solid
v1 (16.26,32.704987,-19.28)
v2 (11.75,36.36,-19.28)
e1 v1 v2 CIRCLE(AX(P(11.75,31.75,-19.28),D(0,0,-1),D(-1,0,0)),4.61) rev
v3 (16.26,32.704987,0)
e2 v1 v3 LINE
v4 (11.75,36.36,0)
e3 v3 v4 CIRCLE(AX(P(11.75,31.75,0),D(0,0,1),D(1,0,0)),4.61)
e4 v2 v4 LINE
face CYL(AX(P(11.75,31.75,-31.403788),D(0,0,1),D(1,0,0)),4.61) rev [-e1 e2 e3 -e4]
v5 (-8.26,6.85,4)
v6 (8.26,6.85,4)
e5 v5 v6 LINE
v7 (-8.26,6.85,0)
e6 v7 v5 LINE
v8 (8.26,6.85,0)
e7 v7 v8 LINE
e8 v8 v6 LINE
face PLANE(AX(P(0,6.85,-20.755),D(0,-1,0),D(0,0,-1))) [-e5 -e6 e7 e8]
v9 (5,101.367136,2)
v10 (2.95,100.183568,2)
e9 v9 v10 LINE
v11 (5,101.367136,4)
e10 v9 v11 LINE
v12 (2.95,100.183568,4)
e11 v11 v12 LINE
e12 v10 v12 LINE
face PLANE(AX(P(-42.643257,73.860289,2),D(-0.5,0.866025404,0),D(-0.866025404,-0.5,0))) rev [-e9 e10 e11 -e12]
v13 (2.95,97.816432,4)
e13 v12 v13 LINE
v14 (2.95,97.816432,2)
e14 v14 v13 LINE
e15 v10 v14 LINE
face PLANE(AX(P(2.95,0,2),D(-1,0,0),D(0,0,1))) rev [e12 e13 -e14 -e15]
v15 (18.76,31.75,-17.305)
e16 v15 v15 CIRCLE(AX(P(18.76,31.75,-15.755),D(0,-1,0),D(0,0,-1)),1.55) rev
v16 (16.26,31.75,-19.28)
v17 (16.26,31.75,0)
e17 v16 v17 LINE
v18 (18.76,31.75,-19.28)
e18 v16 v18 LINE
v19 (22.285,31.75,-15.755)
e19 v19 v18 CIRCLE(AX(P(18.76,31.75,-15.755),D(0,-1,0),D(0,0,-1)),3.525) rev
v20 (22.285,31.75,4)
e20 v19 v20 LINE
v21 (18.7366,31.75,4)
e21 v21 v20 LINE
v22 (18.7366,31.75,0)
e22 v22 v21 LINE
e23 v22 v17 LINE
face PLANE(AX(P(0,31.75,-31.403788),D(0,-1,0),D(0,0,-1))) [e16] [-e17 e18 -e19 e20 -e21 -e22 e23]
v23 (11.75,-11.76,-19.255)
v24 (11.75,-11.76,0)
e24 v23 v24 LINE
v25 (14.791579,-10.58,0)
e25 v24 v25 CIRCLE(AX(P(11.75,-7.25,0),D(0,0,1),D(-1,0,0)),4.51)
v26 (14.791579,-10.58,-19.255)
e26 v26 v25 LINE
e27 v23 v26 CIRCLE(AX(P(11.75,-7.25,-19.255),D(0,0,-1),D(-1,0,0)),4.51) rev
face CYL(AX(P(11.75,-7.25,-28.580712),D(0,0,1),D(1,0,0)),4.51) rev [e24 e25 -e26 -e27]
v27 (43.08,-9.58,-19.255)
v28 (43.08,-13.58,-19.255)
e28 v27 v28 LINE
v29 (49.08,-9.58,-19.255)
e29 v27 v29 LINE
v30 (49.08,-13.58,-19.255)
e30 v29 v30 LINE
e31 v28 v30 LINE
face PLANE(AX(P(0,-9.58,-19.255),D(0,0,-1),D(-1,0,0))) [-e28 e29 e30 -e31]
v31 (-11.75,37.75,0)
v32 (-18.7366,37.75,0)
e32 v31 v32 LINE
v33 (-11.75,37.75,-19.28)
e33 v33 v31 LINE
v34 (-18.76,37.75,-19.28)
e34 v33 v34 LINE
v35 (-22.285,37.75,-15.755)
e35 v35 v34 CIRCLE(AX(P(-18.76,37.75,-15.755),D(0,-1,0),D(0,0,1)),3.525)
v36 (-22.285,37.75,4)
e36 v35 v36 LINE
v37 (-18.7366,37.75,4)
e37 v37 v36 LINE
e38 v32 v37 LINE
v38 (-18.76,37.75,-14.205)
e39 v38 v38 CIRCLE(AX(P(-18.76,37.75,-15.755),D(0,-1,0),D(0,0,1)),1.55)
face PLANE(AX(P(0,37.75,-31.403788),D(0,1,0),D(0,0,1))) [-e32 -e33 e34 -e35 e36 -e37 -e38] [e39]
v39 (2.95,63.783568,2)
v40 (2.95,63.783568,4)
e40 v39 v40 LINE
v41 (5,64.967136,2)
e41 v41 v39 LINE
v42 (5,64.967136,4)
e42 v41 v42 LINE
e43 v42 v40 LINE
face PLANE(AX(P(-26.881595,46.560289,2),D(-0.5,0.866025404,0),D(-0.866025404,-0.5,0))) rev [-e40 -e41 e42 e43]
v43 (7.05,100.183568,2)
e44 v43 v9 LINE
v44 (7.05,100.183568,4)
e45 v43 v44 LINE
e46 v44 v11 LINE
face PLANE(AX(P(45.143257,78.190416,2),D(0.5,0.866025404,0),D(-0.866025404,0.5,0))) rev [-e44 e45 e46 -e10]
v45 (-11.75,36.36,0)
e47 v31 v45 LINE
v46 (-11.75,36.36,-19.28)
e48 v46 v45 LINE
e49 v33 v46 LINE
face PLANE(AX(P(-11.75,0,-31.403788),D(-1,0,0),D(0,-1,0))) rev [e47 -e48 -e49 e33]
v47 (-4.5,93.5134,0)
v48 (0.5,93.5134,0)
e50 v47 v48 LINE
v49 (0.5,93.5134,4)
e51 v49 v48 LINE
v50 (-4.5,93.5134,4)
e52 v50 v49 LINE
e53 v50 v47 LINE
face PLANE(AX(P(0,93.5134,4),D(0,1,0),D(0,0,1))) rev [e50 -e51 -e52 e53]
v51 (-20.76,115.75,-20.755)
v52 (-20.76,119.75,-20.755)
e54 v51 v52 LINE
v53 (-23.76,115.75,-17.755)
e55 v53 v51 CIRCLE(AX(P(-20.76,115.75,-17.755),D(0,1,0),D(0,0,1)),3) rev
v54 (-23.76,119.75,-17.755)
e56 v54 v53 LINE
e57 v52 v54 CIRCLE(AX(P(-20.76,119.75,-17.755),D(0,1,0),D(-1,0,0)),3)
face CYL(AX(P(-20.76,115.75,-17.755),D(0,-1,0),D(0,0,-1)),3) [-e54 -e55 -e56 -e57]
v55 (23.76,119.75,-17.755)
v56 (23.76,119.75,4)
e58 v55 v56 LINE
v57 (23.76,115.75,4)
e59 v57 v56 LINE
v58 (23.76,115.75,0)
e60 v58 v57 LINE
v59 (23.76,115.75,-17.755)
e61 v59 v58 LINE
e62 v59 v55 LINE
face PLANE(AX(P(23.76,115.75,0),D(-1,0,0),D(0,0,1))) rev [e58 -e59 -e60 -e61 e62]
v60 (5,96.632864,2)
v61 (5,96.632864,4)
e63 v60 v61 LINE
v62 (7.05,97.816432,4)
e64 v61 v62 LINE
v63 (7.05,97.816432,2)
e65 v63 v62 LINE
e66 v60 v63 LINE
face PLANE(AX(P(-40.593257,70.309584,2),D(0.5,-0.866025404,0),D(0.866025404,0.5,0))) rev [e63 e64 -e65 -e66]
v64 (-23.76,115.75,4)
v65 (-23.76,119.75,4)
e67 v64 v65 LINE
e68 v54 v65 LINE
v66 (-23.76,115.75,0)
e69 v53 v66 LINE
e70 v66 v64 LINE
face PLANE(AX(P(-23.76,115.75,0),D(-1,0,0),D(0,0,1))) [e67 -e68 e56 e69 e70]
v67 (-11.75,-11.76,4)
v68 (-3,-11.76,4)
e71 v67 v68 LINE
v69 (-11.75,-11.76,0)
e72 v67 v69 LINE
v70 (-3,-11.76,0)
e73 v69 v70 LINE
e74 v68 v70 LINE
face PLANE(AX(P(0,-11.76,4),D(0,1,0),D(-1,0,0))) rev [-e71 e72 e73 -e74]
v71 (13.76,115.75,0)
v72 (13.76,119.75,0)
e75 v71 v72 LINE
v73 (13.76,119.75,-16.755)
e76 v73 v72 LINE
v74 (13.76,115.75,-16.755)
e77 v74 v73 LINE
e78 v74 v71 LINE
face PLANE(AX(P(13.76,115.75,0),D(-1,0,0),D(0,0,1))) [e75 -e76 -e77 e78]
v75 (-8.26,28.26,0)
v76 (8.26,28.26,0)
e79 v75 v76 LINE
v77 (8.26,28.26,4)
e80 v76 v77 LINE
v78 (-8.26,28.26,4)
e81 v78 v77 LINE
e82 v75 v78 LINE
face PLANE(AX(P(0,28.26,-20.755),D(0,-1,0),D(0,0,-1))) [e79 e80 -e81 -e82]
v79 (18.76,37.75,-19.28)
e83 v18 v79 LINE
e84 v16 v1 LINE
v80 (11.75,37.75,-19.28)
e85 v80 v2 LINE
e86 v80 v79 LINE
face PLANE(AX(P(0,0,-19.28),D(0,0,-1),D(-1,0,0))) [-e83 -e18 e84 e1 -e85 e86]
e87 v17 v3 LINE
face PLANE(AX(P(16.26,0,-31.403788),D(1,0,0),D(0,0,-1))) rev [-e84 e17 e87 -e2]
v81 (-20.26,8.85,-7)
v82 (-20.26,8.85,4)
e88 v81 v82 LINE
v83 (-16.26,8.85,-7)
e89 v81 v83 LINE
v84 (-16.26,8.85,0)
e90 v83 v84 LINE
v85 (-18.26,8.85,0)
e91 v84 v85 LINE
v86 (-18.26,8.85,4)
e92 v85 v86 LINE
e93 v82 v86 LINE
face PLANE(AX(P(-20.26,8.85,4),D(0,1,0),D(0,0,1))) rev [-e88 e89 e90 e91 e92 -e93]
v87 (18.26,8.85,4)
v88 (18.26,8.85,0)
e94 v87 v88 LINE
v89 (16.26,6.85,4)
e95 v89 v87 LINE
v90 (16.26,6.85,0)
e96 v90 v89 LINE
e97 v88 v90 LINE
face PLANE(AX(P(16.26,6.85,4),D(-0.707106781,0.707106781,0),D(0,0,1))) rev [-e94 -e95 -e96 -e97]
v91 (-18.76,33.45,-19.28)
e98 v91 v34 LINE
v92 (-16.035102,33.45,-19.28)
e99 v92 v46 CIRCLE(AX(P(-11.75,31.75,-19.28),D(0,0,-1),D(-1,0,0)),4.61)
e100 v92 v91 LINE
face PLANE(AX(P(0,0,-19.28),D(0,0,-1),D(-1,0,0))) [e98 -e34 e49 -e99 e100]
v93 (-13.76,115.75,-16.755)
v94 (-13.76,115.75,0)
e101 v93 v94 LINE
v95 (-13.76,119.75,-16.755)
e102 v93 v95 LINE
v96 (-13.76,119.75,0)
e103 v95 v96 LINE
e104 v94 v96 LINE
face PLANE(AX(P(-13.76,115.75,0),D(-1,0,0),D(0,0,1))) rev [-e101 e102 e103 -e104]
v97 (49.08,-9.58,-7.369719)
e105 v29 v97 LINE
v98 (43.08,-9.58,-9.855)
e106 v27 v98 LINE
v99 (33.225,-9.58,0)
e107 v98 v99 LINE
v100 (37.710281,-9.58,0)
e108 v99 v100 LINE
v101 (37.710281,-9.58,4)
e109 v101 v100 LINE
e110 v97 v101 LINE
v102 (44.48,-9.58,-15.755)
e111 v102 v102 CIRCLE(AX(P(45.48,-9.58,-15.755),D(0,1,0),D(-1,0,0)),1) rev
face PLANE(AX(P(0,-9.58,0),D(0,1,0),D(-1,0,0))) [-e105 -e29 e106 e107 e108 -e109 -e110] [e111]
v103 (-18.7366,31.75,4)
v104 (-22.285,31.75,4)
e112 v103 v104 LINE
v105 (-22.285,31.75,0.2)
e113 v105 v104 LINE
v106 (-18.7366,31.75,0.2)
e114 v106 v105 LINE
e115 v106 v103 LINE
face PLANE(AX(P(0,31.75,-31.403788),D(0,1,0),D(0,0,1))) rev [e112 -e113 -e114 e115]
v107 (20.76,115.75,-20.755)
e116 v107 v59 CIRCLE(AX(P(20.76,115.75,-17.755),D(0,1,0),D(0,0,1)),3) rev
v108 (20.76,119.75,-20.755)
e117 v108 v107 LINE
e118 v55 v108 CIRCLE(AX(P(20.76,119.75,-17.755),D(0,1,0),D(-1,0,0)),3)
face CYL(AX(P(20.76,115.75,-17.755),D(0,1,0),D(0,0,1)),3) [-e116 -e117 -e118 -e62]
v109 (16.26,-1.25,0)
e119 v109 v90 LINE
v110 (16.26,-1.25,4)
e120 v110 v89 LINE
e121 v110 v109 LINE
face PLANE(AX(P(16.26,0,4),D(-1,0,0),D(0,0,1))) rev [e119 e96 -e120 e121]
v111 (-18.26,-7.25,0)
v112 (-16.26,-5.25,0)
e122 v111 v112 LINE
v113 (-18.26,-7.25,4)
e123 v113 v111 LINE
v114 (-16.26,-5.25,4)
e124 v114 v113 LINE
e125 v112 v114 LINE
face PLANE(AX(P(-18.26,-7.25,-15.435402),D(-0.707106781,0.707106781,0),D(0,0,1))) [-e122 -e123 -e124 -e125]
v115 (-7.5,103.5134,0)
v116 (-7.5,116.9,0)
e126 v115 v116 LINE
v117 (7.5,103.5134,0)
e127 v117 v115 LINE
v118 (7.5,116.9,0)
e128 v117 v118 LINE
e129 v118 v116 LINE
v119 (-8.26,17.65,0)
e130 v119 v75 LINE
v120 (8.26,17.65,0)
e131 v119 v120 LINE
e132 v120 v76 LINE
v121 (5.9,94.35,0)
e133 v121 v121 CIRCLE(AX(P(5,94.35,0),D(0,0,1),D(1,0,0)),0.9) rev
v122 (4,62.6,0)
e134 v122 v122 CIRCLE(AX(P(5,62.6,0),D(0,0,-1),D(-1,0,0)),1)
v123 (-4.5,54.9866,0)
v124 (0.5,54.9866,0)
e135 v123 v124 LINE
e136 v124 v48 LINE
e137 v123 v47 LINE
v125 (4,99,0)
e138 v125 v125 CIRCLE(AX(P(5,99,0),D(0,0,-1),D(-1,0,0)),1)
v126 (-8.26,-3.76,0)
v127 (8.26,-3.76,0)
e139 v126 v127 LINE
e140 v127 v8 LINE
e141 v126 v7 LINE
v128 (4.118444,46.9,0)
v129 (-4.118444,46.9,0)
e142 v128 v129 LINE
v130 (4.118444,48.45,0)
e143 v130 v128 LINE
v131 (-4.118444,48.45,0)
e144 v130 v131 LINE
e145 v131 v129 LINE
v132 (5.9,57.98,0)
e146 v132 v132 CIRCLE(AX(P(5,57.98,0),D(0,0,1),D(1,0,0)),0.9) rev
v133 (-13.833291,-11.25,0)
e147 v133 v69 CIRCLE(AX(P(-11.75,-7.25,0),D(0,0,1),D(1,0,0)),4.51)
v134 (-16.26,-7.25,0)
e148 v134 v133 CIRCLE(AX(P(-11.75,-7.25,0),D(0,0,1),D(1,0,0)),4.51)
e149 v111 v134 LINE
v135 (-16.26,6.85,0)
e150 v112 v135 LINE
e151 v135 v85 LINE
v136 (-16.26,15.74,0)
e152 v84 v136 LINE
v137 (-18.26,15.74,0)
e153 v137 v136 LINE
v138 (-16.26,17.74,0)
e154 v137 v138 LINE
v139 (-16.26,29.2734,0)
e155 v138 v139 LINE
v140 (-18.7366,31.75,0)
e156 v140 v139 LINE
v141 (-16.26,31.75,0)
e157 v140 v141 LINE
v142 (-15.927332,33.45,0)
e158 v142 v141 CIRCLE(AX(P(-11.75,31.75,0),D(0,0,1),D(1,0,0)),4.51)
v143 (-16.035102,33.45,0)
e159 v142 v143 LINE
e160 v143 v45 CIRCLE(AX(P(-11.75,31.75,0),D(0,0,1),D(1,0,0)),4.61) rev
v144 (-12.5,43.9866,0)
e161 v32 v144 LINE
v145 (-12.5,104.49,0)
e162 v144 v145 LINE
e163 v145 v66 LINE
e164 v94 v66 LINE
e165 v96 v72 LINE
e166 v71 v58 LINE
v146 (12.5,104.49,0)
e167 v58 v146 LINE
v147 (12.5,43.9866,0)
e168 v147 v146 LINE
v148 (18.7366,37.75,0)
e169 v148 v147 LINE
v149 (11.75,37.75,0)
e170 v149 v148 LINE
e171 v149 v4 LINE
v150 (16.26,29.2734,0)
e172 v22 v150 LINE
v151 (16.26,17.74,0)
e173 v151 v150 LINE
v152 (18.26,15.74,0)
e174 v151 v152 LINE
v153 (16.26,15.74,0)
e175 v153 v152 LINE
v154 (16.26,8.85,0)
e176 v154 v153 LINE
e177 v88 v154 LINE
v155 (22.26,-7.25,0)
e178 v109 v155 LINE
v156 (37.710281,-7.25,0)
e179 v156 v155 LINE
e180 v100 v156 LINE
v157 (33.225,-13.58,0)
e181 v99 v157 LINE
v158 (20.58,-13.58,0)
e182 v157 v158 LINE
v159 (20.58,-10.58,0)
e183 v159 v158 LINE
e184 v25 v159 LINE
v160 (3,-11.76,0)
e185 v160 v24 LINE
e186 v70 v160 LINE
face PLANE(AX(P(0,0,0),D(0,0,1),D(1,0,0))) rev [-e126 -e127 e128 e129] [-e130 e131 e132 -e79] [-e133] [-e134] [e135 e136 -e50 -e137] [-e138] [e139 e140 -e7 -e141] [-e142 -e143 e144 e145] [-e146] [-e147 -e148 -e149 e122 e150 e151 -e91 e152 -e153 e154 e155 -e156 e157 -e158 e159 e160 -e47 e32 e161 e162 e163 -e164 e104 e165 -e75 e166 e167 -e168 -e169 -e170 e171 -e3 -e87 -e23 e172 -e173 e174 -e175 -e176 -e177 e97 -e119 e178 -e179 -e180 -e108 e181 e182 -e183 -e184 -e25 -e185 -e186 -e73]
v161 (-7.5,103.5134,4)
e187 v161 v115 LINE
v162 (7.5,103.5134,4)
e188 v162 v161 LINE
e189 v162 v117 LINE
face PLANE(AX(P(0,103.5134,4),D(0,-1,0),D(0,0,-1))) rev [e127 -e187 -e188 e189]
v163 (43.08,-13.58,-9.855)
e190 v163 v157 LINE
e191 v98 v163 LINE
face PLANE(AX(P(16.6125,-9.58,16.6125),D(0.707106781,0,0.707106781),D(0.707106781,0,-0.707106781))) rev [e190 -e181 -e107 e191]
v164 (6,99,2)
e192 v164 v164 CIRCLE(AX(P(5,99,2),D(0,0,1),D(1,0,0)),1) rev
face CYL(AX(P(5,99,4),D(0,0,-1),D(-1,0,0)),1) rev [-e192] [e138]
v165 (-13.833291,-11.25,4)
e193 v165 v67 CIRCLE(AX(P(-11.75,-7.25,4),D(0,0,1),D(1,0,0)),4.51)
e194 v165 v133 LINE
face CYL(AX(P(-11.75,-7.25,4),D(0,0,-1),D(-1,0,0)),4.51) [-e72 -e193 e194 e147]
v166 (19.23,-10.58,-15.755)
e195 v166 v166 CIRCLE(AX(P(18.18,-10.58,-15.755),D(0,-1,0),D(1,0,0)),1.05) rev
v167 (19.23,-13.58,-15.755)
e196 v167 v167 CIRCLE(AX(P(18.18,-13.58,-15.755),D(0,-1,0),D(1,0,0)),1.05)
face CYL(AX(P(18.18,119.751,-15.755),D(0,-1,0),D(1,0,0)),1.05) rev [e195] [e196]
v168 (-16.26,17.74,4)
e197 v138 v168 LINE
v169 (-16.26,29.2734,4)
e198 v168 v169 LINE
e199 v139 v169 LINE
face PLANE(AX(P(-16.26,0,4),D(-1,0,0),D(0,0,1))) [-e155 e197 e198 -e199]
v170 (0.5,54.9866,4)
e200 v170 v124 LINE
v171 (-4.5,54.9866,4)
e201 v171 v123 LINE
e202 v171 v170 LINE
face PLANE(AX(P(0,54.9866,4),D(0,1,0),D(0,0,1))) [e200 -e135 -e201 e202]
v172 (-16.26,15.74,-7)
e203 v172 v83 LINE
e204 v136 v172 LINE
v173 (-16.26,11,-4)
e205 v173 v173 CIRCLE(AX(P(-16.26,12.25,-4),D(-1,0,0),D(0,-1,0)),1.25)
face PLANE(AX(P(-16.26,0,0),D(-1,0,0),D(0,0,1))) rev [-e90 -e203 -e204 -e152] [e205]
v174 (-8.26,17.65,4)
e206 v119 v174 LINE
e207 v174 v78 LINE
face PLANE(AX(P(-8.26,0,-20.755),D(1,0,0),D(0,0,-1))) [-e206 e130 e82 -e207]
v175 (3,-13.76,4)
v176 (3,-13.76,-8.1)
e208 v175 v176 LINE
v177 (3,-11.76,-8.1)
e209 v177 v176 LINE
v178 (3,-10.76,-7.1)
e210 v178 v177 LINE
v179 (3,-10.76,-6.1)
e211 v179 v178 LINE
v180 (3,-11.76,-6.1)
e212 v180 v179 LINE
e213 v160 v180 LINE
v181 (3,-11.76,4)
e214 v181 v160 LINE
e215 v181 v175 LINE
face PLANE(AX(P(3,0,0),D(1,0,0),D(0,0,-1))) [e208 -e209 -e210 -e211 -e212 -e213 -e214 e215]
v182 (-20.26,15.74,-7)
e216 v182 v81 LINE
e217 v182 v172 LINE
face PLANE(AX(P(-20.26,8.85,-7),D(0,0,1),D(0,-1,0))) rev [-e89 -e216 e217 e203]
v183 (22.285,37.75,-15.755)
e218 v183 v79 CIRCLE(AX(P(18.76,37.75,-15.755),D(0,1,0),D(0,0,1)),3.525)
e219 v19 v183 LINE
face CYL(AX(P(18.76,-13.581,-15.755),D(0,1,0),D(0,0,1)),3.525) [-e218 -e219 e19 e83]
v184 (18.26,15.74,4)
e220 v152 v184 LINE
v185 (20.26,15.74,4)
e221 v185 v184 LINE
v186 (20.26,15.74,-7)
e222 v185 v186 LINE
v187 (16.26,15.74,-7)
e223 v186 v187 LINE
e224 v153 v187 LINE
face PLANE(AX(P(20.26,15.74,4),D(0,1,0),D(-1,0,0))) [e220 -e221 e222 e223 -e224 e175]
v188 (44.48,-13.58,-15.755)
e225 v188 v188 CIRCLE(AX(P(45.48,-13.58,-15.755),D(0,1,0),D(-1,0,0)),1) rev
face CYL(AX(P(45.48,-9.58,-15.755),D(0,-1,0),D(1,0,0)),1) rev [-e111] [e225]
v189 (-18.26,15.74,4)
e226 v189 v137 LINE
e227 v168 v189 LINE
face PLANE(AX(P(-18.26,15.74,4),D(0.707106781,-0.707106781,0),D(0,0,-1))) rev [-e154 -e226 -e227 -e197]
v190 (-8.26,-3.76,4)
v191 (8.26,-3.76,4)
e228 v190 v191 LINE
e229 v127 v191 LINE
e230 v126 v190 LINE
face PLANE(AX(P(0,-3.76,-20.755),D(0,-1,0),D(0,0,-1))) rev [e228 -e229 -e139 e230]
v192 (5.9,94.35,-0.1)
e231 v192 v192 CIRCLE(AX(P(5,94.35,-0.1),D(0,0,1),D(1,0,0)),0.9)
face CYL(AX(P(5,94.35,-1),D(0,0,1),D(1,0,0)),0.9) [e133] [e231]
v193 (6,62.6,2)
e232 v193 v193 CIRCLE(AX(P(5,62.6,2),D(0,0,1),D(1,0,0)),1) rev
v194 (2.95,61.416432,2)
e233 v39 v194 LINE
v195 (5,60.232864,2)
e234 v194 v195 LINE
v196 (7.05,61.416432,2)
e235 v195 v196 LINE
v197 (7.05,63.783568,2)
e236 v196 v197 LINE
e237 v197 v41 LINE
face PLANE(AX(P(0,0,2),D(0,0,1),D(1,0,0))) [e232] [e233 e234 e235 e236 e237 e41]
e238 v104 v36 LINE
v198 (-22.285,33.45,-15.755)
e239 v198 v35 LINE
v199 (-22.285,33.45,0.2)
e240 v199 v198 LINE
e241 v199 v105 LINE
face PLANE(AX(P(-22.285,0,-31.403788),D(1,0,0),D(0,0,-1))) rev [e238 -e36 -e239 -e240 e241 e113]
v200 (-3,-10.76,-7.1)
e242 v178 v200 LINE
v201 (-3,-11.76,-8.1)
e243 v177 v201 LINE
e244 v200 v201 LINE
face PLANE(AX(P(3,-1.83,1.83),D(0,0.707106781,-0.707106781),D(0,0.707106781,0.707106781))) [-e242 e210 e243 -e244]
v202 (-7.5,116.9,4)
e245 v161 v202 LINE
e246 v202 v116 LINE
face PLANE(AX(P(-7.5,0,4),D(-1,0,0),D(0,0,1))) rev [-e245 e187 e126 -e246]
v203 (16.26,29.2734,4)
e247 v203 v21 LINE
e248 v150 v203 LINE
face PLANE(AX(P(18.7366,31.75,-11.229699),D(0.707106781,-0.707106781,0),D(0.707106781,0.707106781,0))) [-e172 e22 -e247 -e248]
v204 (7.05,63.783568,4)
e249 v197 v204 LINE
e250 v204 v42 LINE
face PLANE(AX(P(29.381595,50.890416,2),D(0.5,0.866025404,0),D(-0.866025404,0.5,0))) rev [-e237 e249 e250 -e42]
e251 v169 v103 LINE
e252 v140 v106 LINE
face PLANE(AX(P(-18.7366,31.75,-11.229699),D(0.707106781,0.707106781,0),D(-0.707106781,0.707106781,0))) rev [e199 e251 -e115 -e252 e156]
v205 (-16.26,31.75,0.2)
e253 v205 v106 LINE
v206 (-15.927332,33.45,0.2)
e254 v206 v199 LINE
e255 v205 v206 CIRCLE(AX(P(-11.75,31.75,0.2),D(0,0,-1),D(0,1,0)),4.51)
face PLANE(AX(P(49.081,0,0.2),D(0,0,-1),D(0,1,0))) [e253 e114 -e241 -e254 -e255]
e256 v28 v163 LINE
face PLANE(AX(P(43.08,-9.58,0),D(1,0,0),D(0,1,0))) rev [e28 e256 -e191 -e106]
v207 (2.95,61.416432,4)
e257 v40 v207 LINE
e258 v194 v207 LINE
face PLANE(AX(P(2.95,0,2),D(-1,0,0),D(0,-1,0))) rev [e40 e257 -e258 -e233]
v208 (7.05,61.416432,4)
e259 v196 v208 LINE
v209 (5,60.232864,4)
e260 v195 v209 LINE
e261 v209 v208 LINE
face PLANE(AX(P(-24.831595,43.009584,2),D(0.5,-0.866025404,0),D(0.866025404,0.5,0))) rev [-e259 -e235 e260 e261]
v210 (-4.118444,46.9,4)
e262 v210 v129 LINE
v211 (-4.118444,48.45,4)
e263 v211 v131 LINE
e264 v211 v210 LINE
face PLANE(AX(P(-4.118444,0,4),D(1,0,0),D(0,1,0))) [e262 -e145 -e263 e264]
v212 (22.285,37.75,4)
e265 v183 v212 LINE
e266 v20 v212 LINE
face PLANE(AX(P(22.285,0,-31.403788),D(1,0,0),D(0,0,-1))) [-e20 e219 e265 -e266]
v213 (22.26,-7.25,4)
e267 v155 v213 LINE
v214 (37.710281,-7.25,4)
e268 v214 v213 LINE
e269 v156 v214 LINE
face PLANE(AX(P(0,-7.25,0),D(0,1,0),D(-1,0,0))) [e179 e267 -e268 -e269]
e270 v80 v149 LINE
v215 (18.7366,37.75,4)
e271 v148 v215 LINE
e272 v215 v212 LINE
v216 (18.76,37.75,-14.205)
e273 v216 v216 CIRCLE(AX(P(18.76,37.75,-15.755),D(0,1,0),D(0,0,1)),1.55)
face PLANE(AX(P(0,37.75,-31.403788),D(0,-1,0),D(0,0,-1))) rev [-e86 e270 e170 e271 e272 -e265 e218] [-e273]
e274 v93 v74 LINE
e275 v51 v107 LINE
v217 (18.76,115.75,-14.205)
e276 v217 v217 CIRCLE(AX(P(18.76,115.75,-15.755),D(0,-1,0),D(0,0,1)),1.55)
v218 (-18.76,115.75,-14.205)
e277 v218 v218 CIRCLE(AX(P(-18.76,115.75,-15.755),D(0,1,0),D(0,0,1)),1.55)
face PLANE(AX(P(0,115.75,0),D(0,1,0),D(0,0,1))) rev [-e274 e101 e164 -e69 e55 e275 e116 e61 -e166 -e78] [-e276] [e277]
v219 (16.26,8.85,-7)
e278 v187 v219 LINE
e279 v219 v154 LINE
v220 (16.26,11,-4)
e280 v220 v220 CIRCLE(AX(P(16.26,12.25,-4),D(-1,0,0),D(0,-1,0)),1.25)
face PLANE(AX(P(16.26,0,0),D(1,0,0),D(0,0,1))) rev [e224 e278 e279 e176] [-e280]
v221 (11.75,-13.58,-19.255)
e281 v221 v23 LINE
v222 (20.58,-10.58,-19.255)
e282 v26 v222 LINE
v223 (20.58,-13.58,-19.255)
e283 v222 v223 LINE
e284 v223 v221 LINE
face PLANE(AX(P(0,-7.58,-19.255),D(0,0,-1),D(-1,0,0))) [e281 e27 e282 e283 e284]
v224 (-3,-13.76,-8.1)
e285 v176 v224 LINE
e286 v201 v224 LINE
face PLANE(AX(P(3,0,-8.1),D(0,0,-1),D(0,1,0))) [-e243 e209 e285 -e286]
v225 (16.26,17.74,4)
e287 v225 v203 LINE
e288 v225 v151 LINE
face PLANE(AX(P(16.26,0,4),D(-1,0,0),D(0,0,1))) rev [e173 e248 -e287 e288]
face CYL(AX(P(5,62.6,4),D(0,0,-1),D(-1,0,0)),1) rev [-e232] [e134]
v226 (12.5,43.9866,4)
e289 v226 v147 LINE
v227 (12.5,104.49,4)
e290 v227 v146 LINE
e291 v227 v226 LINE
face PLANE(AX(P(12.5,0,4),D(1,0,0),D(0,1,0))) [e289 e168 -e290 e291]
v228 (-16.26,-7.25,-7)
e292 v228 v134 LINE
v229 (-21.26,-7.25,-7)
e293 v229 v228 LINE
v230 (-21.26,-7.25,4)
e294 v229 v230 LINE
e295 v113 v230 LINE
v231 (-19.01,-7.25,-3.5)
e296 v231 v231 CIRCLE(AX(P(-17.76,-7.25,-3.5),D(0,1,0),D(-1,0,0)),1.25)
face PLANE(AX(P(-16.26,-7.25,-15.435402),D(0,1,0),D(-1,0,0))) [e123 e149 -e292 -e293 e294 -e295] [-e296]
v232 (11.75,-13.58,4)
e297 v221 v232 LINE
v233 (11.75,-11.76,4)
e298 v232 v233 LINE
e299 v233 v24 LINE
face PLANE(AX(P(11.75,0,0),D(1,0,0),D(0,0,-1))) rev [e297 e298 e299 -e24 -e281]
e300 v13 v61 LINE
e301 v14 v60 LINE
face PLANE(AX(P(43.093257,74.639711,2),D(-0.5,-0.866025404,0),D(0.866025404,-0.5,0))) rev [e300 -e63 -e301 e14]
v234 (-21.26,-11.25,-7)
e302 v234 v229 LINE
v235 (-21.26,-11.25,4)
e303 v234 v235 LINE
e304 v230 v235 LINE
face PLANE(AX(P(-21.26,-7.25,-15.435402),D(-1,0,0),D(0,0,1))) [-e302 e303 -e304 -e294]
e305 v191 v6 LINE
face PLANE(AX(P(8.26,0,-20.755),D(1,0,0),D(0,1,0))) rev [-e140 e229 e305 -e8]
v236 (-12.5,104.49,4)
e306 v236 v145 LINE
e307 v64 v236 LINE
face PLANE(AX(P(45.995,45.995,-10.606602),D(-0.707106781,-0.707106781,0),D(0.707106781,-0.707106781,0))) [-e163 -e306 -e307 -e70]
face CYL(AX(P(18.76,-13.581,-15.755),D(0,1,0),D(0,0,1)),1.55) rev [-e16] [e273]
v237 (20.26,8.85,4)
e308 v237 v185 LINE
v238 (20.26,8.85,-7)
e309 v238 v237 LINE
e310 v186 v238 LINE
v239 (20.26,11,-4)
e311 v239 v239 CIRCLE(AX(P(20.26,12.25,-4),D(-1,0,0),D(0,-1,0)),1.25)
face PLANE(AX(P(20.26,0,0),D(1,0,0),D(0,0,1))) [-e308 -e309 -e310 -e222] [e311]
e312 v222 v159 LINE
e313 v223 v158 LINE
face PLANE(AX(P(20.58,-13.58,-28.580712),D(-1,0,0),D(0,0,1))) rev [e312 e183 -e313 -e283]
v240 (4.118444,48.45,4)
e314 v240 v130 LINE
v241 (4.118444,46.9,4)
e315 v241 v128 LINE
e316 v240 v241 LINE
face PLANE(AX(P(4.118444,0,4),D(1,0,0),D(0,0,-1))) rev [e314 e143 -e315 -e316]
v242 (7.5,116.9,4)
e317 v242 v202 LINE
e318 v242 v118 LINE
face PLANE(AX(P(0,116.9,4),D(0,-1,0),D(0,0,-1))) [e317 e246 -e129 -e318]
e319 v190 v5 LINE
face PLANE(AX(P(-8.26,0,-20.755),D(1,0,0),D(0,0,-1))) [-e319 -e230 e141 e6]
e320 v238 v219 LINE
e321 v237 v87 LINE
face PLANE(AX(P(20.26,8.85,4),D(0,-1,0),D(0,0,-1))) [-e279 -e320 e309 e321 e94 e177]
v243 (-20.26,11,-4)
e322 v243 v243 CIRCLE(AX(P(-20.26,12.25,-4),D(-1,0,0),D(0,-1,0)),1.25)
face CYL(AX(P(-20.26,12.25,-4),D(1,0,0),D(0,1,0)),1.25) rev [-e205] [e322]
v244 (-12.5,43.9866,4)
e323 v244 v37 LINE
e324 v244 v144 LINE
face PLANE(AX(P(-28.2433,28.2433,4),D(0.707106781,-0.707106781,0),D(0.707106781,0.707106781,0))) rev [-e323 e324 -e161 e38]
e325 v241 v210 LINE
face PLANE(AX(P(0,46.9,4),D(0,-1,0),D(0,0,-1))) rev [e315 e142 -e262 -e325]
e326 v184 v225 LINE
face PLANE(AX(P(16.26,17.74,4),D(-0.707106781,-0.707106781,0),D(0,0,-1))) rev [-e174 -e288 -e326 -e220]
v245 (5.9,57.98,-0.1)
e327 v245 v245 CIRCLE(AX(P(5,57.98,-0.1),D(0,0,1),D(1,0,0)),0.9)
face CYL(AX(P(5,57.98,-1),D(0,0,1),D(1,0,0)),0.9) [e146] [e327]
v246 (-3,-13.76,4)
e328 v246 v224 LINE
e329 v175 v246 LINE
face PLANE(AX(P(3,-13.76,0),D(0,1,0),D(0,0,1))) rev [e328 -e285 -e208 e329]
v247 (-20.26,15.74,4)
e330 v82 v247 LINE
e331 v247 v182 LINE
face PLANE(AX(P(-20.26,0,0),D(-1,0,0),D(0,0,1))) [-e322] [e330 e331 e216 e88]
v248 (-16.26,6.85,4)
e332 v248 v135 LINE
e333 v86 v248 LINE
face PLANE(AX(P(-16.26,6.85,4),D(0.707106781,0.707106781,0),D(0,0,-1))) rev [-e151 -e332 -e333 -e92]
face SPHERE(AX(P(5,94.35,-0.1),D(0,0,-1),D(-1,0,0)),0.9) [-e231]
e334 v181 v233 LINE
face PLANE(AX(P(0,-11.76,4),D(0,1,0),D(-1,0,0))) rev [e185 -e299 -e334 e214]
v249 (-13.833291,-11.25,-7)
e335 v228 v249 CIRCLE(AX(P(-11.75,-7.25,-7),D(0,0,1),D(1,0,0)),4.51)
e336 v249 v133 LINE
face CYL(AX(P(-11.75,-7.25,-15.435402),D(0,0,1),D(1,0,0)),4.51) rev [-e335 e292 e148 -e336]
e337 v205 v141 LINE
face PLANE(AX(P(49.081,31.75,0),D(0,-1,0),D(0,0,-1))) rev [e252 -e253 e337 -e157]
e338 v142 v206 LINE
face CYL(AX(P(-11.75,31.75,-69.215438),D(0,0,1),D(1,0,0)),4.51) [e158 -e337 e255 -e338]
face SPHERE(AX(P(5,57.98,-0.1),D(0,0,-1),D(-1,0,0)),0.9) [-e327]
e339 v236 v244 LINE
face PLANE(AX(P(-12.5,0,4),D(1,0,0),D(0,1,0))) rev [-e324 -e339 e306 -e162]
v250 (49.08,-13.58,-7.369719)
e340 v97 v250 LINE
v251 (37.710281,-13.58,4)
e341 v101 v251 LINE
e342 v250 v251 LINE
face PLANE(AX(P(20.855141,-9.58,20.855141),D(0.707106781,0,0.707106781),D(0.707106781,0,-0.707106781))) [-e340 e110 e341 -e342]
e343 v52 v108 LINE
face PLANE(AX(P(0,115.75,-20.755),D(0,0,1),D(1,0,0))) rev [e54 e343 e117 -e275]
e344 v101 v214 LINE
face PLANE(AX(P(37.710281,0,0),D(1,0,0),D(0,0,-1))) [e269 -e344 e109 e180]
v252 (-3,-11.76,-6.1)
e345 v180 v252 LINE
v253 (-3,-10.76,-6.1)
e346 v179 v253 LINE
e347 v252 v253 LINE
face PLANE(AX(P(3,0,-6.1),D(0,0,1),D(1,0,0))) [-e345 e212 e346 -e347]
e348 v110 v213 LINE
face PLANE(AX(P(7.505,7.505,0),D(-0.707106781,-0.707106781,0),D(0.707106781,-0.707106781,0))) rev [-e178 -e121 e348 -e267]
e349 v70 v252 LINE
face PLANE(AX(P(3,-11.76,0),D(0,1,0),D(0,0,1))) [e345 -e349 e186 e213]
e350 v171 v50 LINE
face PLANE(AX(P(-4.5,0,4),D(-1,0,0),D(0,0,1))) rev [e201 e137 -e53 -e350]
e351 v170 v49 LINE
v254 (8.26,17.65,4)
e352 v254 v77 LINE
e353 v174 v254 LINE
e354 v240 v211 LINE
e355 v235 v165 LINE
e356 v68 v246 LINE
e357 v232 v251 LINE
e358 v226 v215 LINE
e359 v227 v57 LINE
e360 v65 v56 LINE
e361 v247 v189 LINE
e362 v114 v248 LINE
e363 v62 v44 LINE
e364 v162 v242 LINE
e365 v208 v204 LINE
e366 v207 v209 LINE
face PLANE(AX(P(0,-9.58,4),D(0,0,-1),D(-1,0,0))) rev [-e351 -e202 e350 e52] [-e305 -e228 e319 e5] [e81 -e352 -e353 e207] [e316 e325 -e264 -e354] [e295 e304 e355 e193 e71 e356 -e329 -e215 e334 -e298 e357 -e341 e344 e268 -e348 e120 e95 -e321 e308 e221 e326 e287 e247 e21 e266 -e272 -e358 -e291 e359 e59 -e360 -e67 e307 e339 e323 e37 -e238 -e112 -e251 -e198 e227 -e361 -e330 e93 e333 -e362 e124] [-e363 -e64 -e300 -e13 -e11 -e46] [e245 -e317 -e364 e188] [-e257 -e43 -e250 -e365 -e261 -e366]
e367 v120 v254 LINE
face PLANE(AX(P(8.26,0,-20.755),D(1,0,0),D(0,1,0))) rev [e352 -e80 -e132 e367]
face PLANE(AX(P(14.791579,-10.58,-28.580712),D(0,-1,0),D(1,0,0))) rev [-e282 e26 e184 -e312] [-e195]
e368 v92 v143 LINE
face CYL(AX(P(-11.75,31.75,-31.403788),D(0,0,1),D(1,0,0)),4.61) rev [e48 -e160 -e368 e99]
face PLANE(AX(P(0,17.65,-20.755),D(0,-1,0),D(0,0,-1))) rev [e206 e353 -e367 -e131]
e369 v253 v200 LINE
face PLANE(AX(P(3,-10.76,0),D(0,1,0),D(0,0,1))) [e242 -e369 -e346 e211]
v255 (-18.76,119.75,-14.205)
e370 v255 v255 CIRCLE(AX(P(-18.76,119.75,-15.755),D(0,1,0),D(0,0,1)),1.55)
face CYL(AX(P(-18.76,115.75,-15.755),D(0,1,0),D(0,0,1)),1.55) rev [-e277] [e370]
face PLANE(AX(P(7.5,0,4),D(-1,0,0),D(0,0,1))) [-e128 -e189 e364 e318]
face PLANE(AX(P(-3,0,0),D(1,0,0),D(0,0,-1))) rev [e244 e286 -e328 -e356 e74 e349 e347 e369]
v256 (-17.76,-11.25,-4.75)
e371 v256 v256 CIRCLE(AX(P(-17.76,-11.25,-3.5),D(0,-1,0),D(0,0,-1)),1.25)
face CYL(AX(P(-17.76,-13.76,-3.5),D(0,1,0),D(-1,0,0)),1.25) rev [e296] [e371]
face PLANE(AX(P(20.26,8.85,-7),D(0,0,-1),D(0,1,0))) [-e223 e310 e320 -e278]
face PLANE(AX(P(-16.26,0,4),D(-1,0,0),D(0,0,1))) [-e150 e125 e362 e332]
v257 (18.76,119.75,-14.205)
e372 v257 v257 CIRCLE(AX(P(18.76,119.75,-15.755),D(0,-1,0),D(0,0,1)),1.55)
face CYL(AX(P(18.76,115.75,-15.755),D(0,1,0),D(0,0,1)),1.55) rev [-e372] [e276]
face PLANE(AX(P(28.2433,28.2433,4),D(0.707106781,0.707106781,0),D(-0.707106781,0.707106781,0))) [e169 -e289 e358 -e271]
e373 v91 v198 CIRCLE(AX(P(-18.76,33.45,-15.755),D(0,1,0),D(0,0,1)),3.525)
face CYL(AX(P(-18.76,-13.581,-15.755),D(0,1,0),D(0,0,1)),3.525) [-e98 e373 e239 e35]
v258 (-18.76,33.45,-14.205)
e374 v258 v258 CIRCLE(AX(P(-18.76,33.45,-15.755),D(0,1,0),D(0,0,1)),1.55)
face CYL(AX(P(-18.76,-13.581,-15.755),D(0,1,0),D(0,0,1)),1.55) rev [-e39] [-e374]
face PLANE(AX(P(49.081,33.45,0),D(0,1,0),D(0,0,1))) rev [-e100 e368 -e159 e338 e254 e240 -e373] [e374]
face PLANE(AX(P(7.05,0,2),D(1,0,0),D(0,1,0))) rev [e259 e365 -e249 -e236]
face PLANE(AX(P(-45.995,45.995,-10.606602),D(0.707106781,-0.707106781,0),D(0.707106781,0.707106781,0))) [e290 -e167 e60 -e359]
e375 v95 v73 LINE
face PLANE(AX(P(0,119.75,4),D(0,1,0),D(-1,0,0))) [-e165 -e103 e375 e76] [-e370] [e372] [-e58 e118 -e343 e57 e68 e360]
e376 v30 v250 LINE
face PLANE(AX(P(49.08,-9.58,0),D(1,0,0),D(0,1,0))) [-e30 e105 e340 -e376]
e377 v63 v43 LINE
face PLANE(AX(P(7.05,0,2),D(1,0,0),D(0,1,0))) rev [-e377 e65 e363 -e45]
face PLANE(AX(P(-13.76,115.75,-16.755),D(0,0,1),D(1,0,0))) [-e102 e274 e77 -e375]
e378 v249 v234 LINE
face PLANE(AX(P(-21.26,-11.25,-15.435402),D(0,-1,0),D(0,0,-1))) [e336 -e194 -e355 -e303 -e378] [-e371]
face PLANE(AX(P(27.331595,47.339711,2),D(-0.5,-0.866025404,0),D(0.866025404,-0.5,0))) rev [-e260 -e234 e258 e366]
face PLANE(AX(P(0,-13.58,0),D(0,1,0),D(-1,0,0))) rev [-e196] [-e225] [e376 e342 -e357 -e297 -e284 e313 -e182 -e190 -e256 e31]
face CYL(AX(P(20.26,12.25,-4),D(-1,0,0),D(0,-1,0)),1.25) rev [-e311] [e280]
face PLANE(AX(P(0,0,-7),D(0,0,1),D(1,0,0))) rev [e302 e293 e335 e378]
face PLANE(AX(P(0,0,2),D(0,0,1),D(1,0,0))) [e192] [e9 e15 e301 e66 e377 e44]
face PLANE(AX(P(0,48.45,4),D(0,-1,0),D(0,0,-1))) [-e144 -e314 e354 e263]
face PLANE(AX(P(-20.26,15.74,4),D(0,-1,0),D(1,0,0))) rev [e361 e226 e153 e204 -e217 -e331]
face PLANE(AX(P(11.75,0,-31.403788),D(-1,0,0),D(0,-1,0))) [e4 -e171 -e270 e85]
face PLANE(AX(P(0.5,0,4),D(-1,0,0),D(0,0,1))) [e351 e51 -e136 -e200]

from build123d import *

# Parameters (mm, degrees)
EXTRUDE_1_DEPTH      = 4
SKETCH_2_W           = 15
SKETCH_2_H           = 13.3866
CUT_EXTRUDE_1_DEPTH  = 121.91505324
SKETCH_3_W           = 10
SKETCH_3_H           = 10
SKETCH_3_R           = 1.55
SKETCH_3_H_2         = 14.755
EXTRUDE_2_DEPTH      = 4
EXTRUDE_3_DEPTH      = 4
EXTRUDE_4_DEPTH      = 4
SKETCH_7_W           = 27.52
SKETCH_7_H           = 4
EXTRUDE_5_DEPTH      = 4
EXTRUDE_START        = -4
EXTRUDE_6_DEPTH      = 4
SKETCH_11_W          = 16.52
SKETCH_11_H          = 10.61
CUT_EXTRUDE_2_DEPTH  = 132.763875645
SKETCH_12_W          = 11
SKETCH_12_H          = 6.89
SKETCH_12_R          = 1.25
EXTRUDE_7525_DEPTH   = 4
SKETCH_14_R          = 1
CUT_EXTRUDE_3_DEPTH  = 132.071274218
SKETCH_15_R          = 0.9
EXTRUDE_9_DEPTH      = 1
FILLET_1_R           = 0.9
CUT_EXTRUDE_START    = -2
SKETCH_16_R          = 1
CUT_EXTRUDE_4_DEPTH  = 2
CUT_EXTRUDE_5_DEPTH  = 132.071274218
SKETCH_19_W          = 5
SKETCH_19_H          = 38.5268
SKETCH_19_W_2        = 8.236887868
SKETCH_19_H_2        = 1.55
CUT_EXTRUDE_6_DEPTH  = 132.071274218
EXTRUDE_12_DEPTH     = 23.28
CUT_EXTRUDE_7_REACH  = 99.794
SKETCH_23_R          = 1.55
EXTRUDE_13_DEPTH     = 4
CUT_EXTRUDE_START_2  = -19.28
CUT_EXTRUDE_8_DEPTH  = 19.48
SKETCH_26_W          = 10.1
SKETCH_26_H          = 2
EXTRUDE_14_DEPTH     = 3
EXTRUDE_15_DEPTH     = 19.255
CUT_EXTRUDE_9_REACH  = 145.584
SKETCH_28_R          = 1.05
EXTRUDE_START_2      = -11
EXTRUDE_16_DEPTH     = 11
SKETCH_30_R          = 1.25
CUT_EXTRUDE_10_DEPTH = 138.726600281
CHAMFER_1_SIZE       = 2
FILLET_2_R           = 3


# Read off the part's stored shape, not the designer's step: 切除-拉伸8
with BuildPart() as part:
    # 草图1 → 凸台-拉伸1 (new body)
    with BuildSketch(Plane.XY):
        with BuildLine():
            Line((-16.26, -7.25), (-16.26, 119.75))
            Line((-16.26, 119.75), (16.26, 119.75))
            Line((16.26, 119.75), (16.26, -7.25))
            ThreePointArc((16.26, -7.25), (14.939051583, -10.439051583), (11.75, -11.76))
            Line((11.75, -11.76), (-11.75, -11.76))
            ThreePointArc((-11.75, -11.76), (-14.939051583, -10.439051583), (-16.26, -7.25))
        make_face()
    extrude(amount=EXTRUDE_1_DEPTH)

    # 草图2 → 切除-拉伸1 (cut, through all)
    with BuildSketch(Plane(origin=(0, 0, 0), x_dir=(-1, 0, 0), z_dir=(0, 0, -1))):
        with Locations((0, 110.2067)):
            Rectangle(SKETCH_2_W, SKETCH_2_H)
    extrude(amount=-CUT_EXTRUDE_1_DEPTH, mode=Mode.SUBTRACT)

    # 草图3 → 凸台-拉伸2 (add)
    # profile 1 of 2: a face of its own
    with BuildSketch(Plane(origin=(0, 119.75, 0), x_dir=(1, 0, 0), z_dir=(0, 1, 0))):
        with Locations((-18.76, 15.755)):
            Rectangle(SKETCH_3_W, SKETCH_3_H)
        with Locations(Location((-18.76, 15.755, 0), (0, 0, 270))):
            Circle(SKETCH_3_R, mode=Mode.SUBTRACT)
    # profile 2 of 2: a face of its own
    with BuildSketch(Plane(origin=(0, 119.75, 0), x_dir=(1, 0, 0), z_dir=(0, 1, 0))):
        with Locations((-18.76, 3.3775)):
            Rectangle(SKETCH_3_W, SKETCH_3_H_2)
    extrude_2 = extrude(amount=-EXTRUDE_2_DEPTH)

    # 镜向1: 凸台-拉伸2 across plane
    add(extrude_2.mirror(Plane(origin=(0, 0, 0), x_dir=(0, 0, 1), z_dir=(1, 0, 0))))

    # 草图6 → 凸台-拉伸4 (add)
    with BuildSketch(Plane.XY.offset(4)):
        Polygon((-16.26, 115.75), (-23.76, 115.75), (-16.26, 108.25), align=None)
        Polygon((16.26, 115.75), (16.26, 108.25), (23.76, 115.75), align=None)
    extrude(amount=-EXTRUDE_4_DEPTH)

    # 草图7 → 凸台-拉伸5 (add)
    with BuildSketch(Plane(origin=(0, 119.75, 0), x_dir=(1, 0, 0), z_dir=(0, 1, 0))):
        with Locations((0, 18.755)):
            Rectangle(SKETCH_7_W, SKETCH_7_H)
    extrude(amount=-EXTRUDE_5_DEPTH)



with BuildPart() as body_2:
    # 草图5 → 凸台-拉伸3 (new body)
    with BuildSketch(Plane(origin=(0, -13.58, 0), x_dir=(1, 0, 0), z_dir=(0, 1, 0))):
        Polygon((47.78, 9.855), (43.08, 9.855), (29.225, -4), (37.710281374, -4), (49.08, 7.369718626), (49.08, 9.855), align=None)
        with BuildLine():
            Line((47.78, 19.255), (43.08, 19.255))
            Line((43.08, 19.255), (43.08, 9.855))
            Line((43.08, 9.855), (47.78, 9.855))
            Line((47.78, 9.855), (47.78, 15.105))
            Line((47.78, 15.105), (46.239934208, 15.105))
            ThreePointArc((46.239934208, 15.105), (44.48, 15.755), (46.239934208, 16.405))
            Line((46.239934208, 16.405), (47.78, 16.405))
            Line((47.78, 16.405), (47.78, 19.255))
        make_face()
        with BuildLine():
            Line((49.08, 19.255), (47.78, 19.255))
            Line((47.78, 19.255), (47.78, 16.405))
            Line((47.78, 16.405), (46.239934208, 16.405))
            ThreePointArc((46.239934208, 16.405), (46.418065618, 16.10145764), (46.48, 15.755))
            ThreePointArc((46.48, 15.755), (46.418065618, 15.40854236), (46.239934208, 15.105))
            Line((46.239934208, 15.105), (47.78, 15.105))
            Line((47.78, 15.105), (47.78, 9.855))
            Line((47.78, 9.855), (49.08, 9.855))
            Line((49.08, 9.855), (49.08, 19.255))
        make_face()
    extrude(amount=EXTRUDE_3_DEPTH)


with BuildPart() as part_1:
    add(part.part)

    add(body_2.part)  # 凸台-拉伸6 merges body 2
    # 草图8 → 凸台-拉伸6 (add)
    with BuildSketch(Plane.XY.offset(4).offset(EXTRUDE_START)):
        with BuildLine():
            Line((22.26, -7.25), (16.26, -7.25))
            ThreePointArc((16.26, -7.25), (14.939051583, -10.439051583), (11.75, -11.76))
            Line((11.75, -11.76), (11.75, -13.58))
            Line((11.75, -13.58), (37.710281374, -13.58))
            Line((37.710281374, -13.58), (37.710281374, -7.25))
            Line((37.710281374, -7.25), (22.26, -7.25))
        make_face()
        with BuildLine():
            Line((16.26, -7.25), (11.75, -7.25))
            Line((11.75, -7.25), (11.75, -11.76))
            ThreePointArc((11.75, -11.76), (14.939051583, -10.439051583), (16.26, -7.25))
        make_face()
        Polygon((11.75, 3.26), (11.75, -7.25), (16.26, -7.25), (16.26, -1.25), align=None)
        Polygon((16.26, -1.25), (16.26, -7.25), (22.26, -7.25), align=None)
    extrude(amount=EXTRUDE_6_DEPTH)

    # 草图11 → 切除-拉伸2 (cut, through all)
    with BuildSketch(Plane.XY.offset(4)):
        with Locations((0, 1.545)):
            Rectangle(SKETCH_11_W, SKETCH_11_H)
        with Locations((0, 22.955)):
            Rectangle(SKETCH_11_W, SKETCH_11_H)
    extrude(amount=-CUT_EXTRUDE_2_DEPTH, mode=Mode.SUBTRACT)

    # 草图12 → Extrude 7525 (add)
    with BuildSketch(Plane.ZY.offset(16.26)):
        with Locations((-1.5, 12.295)):
            Rectangle(SKETCH_12_W, SKETCH_12_H)
        with Locations(Location((-4, 12.25, 0), (0, 0, 270))):
            Circle(SKETCH_12_R, mode=Mode.SUBTRACT)
    extrude_7525 = extrude(amount=EXTRUDE_7525_DEPTH)

    # 镜向4: Extrude 7525 across plane
    add(extrude_7525.mirror(Plane(origin=(0, 0, 0), x_dir=(0, 0, 1), z_dir=(1, 0, 0))))

    # 草图14 → 切除-拉伸3 (cut, through all)
    with BuildSketch(Plane(origin=(0, 0, 0), x_dir=(-1, 0, 0), z_dir=(0, 0, -1))):
        with Locations((-5, 62.6)):
            Circle(SKETCH_14_R)
        with Locations((-5, 99)):
            Circle(SKETCH_14_R)
    extrude(amount=-CUT_EXTRUDE_3_DEPTH, mode=Mode.SUBTRACT)

    # 草图15 → 凸台-拉伸9 (add)
    with BuildSketch(Plane(origin=(0, 0, 0), x_dir=(-1, 0, 0), z_dir=(0, 0, -1))):
        with Locations(Location((-5, 94.35, 0), (0, 0, 180))):
            Circle(SKETCH_15_R)
        with Locations(Location((-5, 57.98, 0), (0, 0, 180))):
            Circle(SKETCH_15_R)
    extrude(amount=EXTRUDE_9_DEPTH)

    # 圆角1
    fillet_1_edges = [part_1.edges().sort_by_distance(p)[0] for p in [
        (4.1, 94.35, -1),
        (4.1, 57.98, -1),
    ]]
    fillet(fillet_1_edges, radius=FILLET_1_R)

    # 草图16 → 切除-拉伸4 (cut)
    # profile 1 of 2: a face of its own
    with BuildSketch(Plane.XY.offset(4).offset(CUT_EXTRUDE_START)):
        Polygon((7.05, 61.416431948), (7.05, 63.783568052), (5, 64.967136104), (2.95, 63.783568052), (2.95, 61.416431948), (5, 60.232863896), align=None)
        with Locations(Location((5, 62.6, 0), (0, 0, 180))):
            Circle(SKETCH_16_R, mode=Mode.SUBTRACT)
    # profile 2 of 2: a face of its own
    with BuildSketch(Plane.XY.offset(4).offset(CUT_EXTRUDE_START)):
        Polygon((2.95, 97.816431948), (5, 96.632863896), (7.05, 97.816431948), (7.05, 100.183568052), (5, 101.367136104), (2.95, 100.183568052), align=None)
        with Locations(Location((5, 99, 0), (0, 0, 180))):
            Circle(SKETCH_16_R, mode=Mode.SUBTRACT)
    extrude(amount=CUT_EXTRUDE_4_DEPTH, mode=Mode.SUBTRACT)

    # 草图17 → 切除-拉伸5 (cut, symmetric)
    with BuildSketch(Plane(origin=(0, 0, 0), x_dir=(-1, 0, 0), z_dir=(0, 0, -1))):
        Polygon((-12.5, 104.49), (-16.26, 108.25), (-16.26, 40.2266), (-12.5, 43.9866), align=None)
    cut_extrude_5 = extrude(amount=CUT_EXTRUDE_5_DEPTH, both=True, mode=Mode.SUBTRACT)

    # 镜向2: 切除-拉伸5 across plane
    add(cut_extrude_5.mirror(Plane(origin=(0, 0, 0), x_dir=(0, 0, 1), z_dir=(1, 0, 0))), mode=Mode.SUBTRACT)

    # 草图19 → 切除-拉伸6 (cut, through all)
    with BuildSketch(Plane(origin=(0, 0, 0), x_dir=(-1, 0, 0), z_dir=(0, 0, -1))):
        with Locations((2, 74.25)):
            Rectangle(SKETCH_19_W, SKETCH_19_H)
        with Locations((0, 47.675)):
            Rectangle(SKETCH_19_W_2, SKETCH_19_H_2)
    extrude(amount=-CUT_EXTRUDE_6_DEPTH, mode=Mode.SUBTRACT)

    # 草图22 → 凸台-拉伸12 (add)
    with BuildSketch(Plane.XY.offset(4)):
        with BuildLine():
            Line((16.26, 32.704986911), (16.26, 31.75))
            Line((16.26, 31.75), (22.285, 31.75))
            Line((22.285, 31.75), (22.285, 37.75))
            Line((22.285, 37.75), (11.75, 37.75))
            Line((11.75, 37.75), (11.75, 36.36))
            ThreePointArc((11.75, 36.36), (14.652551493, 35.331521301), (16.26, 32.704986911))
        make_face()
    extrude_12 = extrude(amount=-EXTRUDE_12_DEPTH)

    # 草图23 → 切除-拉伸7 (cut, up to next)
    with BuildSketch(Plane(origin=(0, 37.75, 0), x_dir=(1, 0, 0), z_dir=(0, 1, 0)), mode=Mode.PRIVATE) as cut_extrude_7_sk1:
        with Locations(Location((18.76, 15.755, 0), (0, 0, 270))):
            Circle(SKETCH_23_R)
    cut_extrude_7_tool1 = extrude(cut_extrude_7_sk1.sketch, amount=-CUT_EXTRUDE_7_REACH, mode=Mode.PRIVATE) & part_1.part
    # 草图23 → 切除-拉伸7 (cut, up to next)
    with BuildSketch(Plane(origin=(0, 37.75, 0), x_dir=(1, 0, 0), z_dir=(0, 1, 0)), mode=Mode.PRIVATE) as cut_extrude_7_sk2:
        with BuildLine():
            ThreePointArc((18.76, 19.28), (21.252551404, 18.247551404), (22.285, 15.755))
            Line((22.285, 15.755), (22.285, 19.28))
            Line((22.285, 19.28), (18.76, 19.28))
        make_face()
    cut_extrude_7_tool2 = extrude(cut_extrude_7_sk2.sketch, amount=-CUT_EXTRUDE_7_REACH, mode=Mode.PRIVATE) & part_1.part
    cut_extrude_7_1 = cut_extrude_7_tool1.solids().sort_by_distance((18.76, 37.75, -15.755))[0]
    add(cut_extrude_7_1, mode=Mode.SUBTRACT)
    cut_extrude_7_2 = cut_extrude_7_tool2.solids().sort_by_distance((21.497628, 37.75, -18.492628))[0]
    add(cut_extrude_7_2, mode=Mode.SUBTRACT)
    cut_extrude_7 = cut_extrude_7_1 + cut_extrude_7_2  # 切除-拉伸7 as one shape, for the pattern or mirror that repeats it

    # 草图24 → 凸台-拉伸13 (add)
    with BuildSketch(Plane.XY.offset(4)):
        Polygon((16.26, 40.2266), (18.7366, 37.75), (18.7366, 31.75), (16.26, 29.2734), align=None)
    extrude_13 = extrude(amount=-EXTRUDE_13_DEPTH)

    # 镜向3: 凸台-拉伸12, 切除-拉伸7, 凸台-拉伸13 across plane
    add(extrude_12.mirror(Plane(origin=(0, 0, 0), x_dir=(0, 0, 1), z_dir=(1, 0, 0))))
    add(cut_extrude_7.mirror(Plane(origin=(0, 0, 0), x_dir=(0, 0, 1), z_dir=(1, 0, 0))), mode=Mode.SUBTRACT)
    add(extrude_13.mirror(Plane(origin=(0, 0, 0), x_dir=(0, 0, 1), z_dir=(1, 0, 0))))

    # 切除-拉伸8 outline → 切除-拉伸8 (cut)
    with BuildSketch(Plane.XY.offset(CUT_EXTRUDE_START_2)):
        with BuildLine():
            ThreePointArc((-16.26, 31.75), (-16.176051621, 32.616121846), (-15.927331684, 33.45))
            Line((-15.927331684, 33.45), (-22.285, 33.45))
            Line((-22.285, 33.45), (-22.285, 31.75))
            Line((-22.285, 31.75), (-16.26, 31.75))
        make_face()
    extrude(amount=CUT_EXTRUDE_8_DEPTH, mode=Mode.SUBTRACT)

    # 草图26 → 凸台-拉伸14 (add, symmetric)
    with BuildSketch(Plane(origin=(0, 0, 0), x_dir=(0, 0, -1), z_dir=(1, 0, 0))):
        with Locations((1.05, -12.76)):
            Rectangle(SKETCH_26_W, SKETCH_26_H)
        Polygon((8.1, -11.76), (8.1, -13.76), (6.1, -13.76), (6.1, -11.76), (6.1, -10.76), (7.1, -10.76), align=None)
    extrude(amount=EXTRUDE_14_DEPTH, both=True)

    # 草图27 → 凸台-拉伸15 (add)
    with BuildSketch(Plane(origin=(0, 0, 0), x_dir=(-1, 0, 0), z_dir=(0, 0, -1))):
        with BuildLine():
            Line((-11.75, -11.76), (-11.75, -13.58))
            Line((-11.75, -13.58), (-20.58, -13.58))
            Line((-20.58, -13.58), (-20.58, -10.58))
            Line((-20.58, -10.58), (-14.791578538, -10.58))
            ThreePointArc((-14.791578538, -10.58), (-13.381226532, -11.454664077), (-11.75, -11.76))
        make_face()
    extrude(amount=EXTRUDE_15_DEPTH)

    # 草图28 → 切除-拉伸9 (cut, up to next)
    with BuildSketch(Plane.XZ.offset(13.58), mode=Mode.PRIVATE) as cut_extrude_9_sk1:
        with Locations((18.18, -15.755)):
            Circle(SKETCH_28_R)
    cut_extrude_9_tool1 = extrude(cut_extrude_9_sk1.sketch, amount=-CUT_EXTRUDE_9_REACH, mode=Mode.PRIVATE) & part_1.part
    add(cut_extrude_9_tool1.solids().sort_by_distance((18.18, -13.58, -15.755))[0], mode=Mode.SUBTRACT)

    # 草图29 → 凸台-拉伸16 (add)
    with BuildSketch(Plane.XY.offset(4).offset(EXTRUDE_START_2)):
        with BuildLine():
            Line((-21.26, -7.25), (-21.26, -11.25))
            Line((-21.26, -11.25), (-13.833290666, -11.25))
            ThreePointArc((-13.833290666, -11.25), (-15.605887764, -9.589279707), (-16.26, -7.25))
            Line((-16.26, -7.25), (-21.26, -7.25))
        make_face()
    extrude(amount=EXTRUDE_16_DEPTH)

    # 草图30 → 切除-拉伸10 (cut, through all)
    with BuildSketch(Plane(origin=(0, -7.25, 0), x_dir=(1, 0, 0), z_dir=(0, 1, 0))):
        with Locations(Location((-17.76, 3.5, 0), (0, 0, 180))):
            Circle(SKETCH_30_R)
    extrude(amount=-CUT_EXTRUDE_10_DEPTH, mode=Mode.SUBTRACT)

    # 倒角1
    chamfer_1_edges = [part_1.edges().sort_by_distance(p)[0] for p in [
        (-16.26, 8.85, 2),
        (-16.26, 15.74, 2),
        (16.26, 8.85, 2),
        (16.26, 15.74, 2),
        (-16.26, -7.25, 2),
    ]]
    chamfer(chamfer_1_edges, length=CHAMFER_1_SIZE)

    # 圆角2
    fillet_2_edges = [part_1.edges().sort_by_distance(p)[0] for p in [
        (-23.76, 117.75, -20.755),
        (23.76, 117.75, -20.755),
    ]]
    fillet(fillet_2_edges, radius=FILLET_2_R)


solid = part_1.part
